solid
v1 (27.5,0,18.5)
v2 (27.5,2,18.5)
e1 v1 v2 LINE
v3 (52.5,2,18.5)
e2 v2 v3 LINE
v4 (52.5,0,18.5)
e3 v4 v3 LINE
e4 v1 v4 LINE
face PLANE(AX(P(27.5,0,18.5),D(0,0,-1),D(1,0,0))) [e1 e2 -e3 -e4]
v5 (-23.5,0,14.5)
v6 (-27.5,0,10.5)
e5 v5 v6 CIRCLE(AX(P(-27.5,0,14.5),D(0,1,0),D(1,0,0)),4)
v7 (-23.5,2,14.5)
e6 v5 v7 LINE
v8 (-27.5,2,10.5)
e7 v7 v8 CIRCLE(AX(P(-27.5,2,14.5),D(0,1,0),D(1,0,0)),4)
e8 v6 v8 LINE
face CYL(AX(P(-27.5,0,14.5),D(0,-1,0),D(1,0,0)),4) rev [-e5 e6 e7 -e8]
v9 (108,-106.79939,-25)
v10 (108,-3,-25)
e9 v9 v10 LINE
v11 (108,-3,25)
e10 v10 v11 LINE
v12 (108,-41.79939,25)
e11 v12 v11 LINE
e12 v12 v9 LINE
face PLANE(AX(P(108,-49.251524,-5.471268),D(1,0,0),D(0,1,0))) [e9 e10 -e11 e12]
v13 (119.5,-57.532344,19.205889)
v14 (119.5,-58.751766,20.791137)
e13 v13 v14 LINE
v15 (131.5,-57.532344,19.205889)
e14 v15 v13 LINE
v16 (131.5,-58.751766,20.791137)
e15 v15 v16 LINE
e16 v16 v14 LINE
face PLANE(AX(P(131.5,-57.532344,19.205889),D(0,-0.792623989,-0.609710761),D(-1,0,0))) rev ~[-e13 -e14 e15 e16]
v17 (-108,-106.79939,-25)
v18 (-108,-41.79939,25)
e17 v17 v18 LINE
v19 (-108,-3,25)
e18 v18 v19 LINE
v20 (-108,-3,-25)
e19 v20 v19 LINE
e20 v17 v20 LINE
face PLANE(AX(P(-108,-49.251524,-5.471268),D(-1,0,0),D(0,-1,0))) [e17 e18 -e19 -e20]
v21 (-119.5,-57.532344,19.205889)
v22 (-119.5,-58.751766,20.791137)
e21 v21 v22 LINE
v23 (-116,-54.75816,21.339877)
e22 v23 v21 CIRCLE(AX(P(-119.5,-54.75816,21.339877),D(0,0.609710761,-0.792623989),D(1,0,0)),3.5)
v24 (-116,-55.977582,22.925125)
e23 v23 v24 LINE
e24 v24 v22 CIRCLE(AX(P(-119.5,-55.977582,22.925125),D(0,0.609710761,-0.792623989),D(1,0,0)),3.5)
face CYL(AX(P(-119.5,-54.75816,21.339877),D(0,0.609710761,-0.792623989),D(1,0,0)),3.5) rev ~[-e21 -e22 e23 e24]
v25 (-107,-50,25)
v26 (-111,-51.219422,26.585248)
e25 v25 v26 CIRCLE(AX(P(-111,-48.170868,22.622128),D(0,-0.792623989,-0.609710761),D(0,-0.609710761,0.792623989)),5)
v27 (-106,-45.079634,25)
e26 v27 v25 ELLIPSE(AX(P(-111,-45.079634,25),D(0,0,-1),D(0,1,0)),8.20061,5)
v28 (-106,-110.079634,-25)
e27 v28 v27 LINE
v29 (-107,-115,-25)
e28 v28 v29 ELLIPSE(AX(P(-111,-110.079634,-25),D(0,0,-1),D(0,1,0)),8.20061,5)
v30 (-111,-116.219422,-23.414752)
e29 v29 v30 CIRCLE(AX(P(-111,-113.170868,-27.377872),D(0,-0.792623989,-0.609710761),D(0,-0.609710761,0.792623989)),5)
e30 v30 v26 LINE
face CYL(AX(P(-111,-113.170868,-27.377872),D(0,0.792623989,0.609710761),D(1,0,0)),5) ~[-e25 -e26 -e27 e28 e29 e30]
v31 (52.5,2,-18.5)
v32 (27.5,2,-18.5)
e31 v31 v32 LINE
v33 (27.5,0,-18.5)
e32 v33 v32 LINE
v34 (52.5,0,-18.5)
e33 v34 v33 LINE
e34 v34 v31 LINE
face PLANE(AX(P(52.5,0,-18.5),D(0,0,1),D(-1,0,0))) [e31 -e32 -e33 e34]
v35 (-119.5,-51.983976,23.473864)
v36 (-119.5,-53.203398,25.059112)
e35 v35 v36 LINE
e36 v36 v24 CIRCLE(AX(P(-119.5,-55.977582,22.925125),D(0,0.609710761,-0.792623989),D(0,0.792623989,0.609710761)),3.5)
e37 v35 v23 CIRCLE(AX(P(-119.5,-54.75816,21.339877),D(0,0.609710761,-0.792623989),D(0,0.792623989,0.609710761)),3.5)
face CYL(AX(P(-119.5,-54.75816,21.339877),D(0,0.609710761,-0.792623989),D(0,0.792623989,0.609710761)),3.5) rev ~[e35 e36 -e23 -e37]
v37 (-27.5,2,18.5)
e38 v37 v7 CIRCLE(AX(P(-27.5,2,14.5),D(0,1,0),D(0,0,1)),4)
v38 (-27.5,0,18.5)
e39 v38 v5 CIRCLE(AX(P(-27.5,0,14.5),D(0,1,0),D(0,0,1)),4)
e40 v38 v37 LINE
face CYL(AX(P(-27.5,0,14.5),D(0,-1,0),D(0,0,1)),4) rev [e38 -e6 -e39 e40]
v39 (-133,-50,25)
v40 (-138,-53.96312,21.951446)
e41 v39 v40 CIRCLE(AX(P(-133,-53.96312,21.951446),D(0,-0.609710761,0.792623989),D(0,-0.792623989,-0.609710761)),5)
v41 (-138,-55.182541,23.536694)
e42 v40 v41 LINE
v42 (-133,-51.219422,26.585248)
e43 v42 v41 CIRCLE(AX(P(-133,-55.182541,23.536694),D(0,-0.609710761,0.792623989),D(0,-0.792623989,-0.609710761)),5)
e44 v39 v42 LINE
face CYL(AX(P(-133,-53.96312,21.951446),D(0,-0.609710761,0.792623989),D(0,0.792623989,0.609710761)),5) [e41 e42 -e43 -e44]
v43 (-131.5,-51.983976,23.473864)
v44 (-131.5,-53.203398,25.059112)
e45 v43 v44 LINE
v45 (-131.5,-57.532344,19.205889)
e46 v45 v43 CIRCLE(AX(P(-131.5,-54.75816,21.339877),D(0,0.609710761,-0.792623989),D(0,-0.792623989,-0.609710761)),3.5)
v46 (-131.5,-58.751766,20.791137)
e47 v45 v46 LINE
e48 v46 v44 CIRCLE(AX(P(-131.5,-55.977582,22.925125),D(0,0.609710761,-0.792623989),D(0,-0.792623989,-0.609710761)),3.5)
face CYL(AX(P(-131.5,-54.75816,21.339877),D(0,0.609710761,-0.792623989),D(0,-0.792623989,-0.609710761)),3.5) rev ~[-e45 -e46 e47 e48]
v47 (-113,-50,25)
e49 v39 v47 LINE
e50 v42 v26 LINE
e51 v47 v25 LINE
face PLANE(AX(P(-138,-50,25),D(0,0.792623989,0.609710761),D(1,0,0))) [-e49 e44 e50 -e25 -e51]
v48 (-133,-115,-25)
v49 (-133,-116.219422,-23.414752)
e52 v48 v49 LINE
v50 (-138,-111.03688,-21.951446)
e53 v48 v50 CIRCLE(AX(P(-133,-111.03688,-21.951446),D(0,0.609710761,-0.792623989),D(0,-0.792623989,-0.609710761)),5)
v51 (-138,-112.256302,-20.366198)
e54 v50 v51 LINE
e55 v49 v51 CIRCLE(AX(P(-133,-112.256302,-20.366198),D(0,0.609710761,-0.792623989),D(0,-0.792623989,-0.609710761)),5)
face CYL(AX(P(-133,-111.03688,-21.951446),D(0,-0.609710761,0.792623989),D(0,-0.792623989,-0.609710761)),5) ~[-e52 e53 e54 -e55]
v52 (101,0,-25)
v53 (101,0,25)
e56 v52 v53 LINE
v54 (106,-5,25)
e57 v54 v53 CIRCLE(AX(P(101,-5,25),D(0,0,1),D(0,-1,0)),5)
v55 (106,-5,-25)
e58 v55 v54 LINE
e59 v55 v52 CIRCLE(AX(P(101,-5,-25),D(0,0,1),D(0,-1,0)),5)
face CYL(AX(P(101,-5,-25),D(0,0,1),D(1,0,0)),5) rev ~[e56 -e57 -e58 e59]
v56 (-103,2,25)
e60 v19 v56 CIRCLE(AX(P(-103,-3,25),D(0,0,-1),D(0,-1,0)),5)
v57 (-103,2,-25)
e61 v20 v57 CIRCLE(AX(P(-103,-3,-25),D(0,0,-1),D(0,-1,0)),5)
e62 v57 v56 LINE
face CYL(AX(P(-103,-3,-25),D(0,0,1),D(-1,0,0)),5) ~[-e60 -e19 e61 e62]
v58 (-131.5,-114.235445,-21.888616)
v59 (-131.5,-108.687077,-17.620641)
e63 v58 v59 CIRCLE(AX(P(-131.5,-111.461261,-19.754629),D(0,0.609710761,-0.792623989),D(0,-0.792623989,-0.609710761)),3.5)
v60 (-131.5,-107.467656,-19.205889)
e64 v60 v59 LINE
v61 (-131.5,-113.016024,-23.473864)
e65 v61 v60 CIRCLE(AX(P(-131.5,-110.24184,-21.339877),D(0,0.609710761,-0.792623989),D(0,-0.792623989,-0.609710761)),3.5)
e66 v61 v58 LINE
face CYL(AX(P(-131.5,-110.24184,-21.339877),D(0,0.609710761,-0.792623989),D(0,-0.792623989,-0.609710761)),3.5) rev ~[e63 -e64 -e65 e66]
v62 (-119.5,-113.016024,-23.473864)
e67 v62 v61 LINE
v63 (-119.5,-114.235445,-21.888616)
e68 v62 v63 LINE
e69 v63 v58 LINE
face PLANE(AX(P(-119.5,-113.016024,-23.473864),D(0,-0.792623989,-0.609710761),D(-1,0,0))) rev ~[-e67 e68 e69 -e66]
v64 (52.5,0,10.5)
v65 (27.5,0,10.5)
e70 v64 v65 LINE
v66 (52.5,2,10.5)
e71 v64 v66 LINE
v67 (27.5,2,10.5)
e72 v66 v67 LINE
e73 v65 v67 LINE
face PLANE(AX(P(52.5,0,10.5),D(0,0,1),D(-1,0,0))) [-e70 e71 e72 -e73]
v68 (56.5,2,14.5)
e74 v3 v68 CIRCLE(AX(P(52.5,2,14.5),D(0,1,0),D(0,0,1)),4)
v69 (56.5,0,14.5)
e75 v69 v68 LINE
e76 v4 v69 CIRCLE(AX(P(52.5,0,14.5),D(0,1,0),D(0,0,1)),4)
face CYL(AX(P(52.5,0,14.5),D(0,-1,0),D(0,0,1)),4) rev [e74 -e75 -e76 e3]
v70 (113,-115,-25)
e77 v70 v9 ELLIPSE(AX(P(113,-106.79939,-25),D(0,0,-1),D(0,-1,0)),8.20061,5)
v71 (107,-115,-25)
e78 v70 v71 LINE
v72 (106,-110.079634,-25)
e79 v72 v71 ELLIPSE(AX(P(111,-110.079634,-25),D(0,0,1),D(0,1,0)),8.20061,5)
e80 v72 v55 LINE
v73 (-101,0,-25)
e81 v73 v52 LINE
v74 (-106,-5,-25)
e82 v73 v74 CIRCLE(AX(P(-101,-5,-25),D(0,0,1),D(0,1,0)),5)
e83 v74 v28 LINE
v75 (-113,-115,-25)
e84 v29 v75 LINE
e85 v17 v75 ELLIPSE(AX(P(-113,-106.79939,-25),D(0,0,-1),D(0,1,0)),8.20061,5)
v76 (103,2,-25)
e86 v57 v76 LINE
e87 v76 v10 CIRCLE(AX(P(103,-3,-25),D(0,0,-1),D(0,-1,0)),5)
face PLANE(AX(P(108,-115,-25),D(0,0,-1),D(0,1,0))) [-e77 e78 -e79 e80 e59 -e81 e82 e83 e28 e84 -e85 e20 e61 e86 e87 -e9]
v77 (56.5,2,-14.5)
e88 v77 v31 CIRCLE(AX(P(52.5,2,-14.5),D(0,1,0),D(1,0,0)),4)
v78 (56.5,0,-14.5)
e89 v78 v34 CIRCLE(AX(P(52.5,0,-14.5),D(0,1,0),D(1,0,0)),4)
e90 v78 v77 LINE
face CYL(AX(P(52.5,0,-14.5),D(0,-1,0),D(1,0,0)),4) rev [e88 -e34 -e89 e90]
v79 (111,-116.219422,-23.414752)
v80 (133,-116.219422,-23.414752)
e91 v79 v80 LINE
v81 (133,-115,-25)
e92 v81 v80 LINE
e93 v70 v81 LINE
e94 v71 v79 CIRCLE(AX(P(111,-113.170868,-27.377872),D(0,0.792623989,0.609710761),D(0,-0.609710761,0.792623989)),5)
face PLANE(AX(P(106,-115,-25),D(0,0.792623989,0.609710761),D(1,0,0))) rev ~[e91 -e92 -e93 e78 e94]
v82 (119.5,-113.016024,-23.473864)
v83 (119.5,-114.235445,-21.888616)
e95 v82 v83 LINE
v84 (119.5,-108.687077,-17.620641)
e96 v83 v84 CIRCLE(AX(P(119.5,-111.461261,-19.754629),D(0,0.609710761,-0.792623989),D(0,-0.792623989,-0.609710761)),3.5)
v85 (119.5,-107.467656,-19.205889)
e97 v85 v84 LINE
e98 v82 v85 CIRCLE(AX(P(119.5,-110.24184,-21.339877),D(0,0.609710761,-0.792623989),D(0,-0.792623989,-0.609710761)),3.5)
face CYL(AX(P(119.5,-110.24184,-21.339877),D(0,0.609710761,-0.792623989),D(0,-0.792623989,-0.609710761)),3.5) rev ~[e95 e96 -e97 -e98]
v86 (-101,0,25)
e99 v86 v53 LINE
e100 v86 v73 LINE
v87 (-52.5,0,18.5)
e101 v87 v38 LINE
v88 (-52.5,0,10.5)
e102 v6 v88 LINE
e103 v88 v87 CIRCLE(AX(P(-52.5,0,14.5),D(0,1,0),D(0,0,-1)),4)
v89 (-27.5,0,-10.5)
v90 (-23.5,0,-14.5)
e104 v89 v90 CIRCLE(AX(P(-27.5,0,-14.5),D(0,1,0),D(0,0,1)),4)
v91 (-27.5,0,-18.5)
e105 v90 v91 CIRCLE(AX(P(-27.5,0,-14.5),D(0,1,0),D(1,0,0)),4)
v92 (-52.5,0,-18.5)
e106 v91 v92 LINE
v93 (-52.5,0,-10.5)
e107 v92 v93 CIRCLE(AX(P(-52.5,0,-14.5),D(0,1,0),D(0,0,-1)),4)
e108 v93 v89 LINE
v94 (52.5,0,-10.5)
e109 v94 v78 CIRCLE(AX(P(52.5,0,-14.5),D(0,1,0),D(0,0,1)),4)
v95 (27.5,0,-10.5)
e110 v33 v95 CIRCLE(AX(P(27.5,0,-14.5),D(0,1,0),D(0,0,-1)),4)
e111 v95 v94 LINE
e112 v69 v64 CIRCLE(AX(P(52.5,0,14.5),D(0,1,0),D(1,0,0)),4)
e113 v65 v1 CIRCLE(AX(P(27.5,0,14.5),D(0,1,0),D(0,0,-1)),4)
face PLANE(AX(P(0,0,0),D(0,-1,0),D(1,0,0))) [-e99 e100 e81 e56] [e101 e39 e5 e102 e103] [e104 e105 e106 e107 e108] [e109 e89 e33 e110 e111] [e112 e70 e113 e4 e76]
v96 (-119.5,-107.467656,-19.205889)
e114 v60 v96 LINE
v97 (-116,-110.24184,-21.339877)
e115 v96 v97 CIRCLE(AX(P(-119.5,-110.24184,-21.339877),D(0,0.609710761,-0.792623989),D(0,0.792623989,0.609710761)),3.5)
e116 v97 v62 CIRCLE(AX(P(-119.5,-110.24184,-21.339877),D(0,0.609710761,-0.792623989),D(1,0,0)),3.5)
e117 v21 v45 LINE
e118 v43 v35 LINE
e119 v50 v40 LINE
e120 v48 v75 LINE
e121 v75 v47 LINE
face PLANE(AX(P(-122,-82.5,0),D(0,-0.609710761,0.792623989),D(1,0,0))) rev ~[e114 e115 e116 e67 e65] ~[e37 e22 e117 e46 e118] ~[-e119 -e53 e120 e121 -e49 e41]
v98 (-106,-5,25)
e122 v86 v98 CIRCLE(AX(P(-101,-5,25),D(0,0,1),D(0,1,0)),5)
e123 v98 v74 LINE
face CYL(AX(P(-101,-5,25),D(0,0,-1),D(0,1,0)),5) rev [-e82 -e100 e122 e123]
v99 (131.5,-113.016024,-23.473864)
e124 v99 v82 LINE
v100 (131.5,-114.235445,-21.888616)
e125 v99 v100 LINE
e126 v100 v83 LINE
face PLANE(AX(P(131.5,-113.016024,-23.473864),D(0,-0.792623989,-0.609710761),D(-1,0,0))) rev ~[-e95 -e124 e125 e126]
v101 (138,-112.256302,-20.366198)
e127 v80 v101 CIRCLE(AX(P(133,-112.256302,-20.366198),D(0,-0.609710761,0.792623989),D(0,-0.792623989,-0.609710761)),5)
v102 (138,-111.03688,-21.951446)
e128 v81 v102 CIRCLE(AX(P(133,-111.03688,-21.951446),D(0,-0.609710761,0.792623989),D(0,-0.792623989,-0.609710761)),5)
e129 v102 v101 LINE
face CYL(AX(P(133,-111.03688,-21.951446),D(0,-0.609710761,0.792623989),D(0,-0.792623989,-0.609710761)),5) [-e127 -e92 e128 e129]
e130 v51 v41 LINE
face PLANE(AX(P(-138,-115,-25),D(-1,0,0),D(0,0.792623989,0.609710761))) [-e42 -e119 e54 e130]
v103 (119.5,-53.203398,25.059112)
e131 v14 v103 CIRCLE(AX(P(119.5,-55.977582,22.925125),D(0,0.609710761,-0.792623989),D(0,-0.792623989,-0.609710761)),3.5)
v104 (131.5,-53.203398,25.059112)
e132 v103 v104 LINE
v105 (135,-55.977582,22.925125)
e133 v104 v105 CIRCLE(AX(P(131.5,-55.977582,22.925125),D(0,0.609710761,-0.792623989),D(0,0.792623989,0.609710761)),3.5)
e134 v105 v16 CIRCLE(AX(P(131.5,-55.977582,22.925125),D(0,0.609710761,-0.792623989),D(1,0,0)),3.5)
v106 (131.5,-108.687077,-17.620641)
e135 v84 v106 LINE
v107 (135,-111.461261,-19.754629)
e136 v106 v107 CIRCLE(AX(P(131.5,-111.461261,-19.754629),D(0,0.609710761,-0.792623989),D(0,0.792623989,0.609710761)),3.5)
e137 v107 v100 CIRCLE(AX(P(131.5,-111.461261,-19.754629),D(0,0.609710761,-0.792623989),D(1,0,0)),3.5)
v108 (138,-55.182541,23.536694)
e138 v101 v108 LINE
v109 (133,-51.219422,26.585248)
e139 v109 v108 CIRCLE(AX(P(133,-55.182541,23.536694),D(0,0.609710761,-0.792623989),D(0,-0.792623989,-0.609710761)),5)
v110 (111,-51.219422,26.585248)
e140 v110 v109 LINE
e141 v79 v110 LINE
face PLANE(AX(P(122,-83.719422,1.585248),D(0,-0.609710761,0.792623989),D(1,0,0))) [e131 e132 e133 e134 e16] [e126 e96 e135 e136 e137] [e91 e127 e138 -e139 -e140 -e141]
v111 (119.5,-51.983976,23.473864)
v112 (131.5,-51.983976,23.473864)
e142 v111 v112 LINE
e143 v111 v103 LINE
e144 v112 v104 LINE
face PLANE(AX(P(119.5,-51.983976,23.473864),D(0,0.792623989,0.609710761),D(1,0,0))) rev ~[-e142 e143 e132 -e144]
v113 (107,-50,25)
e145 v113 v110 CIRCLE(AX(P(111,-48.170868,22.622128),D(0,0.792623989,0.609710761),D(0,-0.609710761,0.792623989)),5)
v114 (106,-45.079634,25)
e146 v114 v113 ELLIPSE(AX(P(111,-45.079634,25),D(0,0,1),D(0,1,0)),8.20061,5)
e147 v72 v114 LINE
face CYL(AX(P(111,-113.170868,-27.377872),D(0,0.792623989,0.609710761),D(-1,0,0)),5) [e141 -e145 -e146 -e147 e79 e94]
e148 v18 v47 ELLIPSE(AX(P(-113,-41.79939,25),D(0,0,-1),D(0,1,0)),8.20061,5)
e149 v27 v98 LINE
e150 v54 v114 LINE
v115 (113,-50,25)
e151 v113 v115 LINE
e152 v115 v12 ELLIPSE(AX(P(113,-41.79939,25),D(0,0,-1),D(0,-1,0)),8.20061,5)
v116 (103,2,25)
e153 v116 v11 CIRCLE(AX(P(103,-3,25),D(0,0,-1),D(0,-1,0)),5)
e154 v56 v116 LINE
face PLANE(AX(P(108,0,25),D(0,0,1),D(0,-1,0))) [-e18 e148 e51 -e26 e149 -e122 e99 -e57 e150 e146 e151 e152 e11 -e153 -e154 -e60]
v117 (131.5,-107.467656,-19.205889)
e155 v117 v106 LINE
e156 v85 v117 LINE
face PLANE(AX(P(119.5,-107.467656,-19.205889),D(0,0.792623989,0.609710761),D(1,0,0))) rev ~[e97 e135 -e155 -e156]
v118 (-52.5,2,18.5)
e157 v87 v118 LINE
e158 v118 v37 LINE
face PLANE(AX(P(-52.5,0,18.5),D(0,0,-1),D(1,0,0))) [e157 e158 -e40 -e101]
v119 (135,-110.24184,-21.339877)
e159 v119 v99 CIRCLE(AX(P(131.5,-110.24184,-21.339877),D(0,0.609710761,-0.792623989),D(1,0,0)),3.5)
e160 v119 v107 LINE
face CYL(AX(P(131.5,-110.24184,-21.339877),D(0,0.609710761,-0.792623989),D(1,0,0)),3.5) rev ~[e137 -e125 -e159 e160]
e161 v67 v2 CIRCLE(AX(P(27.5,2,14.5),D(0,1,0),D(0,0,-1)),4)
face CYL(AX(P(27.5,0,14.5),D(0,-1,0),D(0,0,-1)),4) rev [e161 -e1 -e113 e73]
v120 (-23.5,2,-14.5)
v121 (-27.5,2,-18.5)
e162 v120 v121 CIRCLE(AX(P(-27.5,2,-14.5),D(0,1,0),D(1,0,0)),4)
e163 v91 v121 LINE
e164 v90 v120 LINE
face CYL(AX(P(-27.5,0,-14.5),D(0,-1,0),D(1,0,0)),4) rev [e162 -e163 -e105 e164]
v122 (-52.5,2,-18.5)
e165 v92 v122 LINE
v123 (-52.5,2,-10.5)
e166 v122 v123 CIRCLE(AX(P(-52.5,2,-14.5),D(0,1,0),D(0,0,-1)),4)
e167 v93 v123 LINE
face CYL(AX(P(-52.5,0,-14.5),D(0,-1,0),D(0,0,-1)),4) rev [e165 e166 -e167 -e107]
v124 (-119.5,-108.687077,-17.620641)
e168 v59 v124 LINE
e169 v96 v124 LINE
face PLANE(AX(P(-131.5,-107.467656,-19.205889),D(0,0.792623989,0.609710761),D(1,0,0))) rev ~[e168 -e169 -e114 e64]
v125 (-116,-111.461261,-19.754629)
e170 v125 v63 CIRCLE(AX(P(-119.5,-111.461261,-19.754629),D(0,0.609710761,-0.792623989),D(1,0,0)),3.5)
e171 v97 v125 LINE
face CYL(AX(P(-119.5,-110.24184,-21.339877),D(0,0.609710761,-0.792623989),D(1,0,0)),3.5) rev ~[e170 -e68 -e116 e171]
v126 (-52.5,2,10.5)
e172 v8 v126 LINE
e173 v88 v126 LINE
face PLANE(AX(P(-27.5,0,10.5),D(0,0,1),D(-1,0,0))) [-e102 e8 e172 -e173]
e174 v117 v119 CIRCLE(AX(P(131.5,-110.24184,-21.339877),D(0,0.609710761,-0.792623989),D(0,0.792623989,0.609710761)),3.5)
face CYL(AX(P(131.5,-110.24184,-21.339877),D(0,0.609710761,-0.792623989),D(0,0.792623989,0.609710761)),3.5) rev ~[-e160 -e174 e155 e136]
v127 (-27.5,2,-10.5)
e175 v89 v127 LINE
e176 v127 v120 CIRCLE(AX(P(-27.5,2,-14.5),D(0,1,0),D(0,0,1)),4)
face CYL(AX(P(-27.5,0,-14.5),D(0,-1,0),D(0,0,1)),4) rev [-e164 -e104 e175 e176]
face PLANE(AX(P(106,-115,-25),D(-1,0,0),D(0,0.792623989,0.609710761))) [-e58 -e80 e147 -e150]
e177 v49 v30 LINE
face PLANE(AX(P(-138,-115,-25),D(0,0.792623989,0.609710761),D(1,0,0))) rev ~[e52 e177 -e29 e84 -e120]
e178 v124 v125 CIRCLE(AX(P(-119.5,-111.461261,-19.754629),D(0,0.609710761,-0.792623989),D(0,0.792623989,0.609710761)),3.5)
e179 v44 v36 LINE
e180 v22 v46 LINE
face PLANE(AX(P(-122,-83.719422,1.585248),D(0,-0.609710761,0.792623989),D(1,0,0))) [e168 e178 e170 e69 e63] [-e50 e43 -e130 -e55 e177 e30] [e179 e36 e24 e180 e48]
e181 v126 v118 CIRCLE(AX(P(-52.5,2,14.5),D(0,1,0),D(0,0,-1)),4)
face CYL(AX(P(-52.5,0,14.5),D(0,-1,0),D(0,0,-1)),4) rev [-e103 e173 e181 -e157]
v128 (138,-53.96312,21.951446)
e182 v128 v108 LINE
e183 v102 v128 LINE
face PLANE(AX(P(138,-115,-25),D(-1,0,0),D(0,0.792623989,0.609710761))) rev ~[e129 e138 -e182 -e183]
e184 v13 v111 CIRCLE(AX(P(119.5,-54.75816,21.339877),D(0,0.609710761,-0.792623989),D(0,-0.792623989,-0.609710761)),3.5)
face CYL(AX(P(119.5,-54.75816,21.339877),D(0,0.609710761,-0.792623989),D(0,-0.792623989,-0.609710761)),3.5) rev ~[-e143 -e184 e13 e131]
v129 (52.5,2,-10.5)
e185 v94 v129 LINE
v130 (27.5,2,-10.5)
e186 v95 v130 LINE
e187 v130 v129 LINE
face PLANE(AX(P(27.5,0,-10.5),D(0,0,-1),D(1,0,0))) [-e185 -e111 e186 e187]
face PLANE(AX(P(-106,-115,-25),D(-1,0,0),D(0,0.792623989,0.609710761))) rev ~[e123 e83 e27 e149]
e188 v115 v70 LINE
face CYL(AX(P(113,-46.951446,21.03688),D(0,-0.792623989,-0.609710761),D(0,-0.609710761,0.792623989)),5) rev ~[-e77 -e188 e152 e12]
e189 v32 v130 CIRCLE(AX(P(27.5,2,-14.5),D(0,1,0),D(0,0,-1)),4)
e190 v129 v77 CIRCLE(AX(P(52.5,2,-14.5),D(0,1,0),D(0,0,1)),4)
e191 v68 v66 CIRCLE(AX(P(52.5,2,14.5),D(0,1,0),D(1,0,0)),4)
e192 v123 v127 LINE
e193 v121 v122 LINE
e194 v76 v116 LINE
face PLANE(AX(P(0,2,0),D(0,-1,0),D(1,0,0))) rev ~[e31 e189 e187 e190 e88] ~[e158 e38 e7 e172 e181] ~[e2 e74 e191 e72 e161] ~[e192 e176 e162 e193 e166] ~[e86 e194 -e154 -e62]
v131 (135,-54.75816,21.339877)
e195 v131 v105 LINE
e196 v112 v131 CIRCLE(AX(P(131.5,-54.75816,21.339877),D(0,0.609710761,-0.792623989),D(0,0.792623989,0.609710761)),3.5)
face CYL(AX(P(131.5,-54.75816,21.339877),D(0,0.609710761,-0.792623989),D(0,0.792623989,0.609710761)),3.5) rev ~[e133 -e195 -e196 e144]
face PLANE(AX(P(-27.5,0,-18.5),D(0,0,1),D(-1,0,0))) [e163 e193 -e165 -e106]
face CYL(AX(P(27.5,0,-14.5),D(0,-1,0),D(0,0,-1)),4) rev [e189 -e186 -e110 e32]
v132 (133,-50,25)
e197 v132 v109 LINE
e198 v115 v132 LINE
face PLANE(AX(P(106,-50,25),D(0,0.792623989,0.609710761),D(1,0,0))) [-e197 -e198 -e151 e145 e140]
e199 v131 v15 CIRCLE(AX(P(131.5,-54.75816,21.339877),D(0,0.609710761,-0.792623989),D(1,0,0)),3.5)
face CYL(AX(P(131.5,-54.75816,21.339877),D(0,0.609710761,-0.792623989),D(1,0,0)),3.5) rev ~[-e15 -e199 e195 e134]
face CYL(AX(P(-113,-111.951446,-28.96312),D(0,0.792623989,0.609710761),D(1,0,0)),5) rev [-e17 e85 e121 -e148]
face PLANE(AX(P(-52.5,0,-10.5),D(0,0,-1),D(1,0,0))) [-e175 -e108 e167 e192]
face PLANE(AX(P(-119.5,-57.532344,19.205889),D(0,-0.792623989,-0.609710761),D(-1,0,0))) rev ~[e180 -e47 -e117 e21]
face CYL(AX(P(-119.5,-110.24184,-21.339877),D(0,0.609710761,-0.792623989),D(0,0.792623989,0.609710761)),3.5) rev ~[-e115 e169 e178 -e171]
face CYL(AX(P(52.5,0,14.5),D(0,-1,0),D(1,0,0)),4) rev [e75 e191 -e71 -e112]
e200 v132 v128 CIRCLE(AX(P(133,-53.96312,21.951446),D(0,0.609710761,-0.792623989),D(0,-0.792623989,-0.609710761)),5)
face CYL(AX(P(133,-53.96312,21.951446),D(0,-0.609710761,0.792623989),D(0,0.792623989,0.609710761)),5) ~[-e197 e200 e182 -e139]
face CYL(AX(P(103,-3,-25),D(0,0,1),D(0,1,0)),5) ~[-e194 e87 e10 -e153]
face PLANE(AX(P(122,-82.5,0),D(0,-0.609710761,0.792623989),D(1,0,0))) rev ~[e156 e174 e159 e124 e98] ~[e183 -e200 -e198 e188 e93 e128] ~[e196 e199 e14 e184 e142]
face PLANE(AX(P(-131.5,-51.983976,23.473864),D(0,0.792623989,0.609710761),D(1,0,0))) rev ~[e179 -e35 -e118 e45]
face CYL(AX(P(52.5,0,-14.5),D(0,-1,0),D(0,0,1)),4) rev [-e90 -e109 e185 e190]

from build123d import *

# Parameters (mm, degrees)
F0_W     = 216
F0_H     = 50
F1_DEPTH = 2
F3_DEPTH = 2
F4_W     = 32
F4_H     = 82.0060973343
F5_DEPTH = 2
F7_DEPTH = 2
F8_W     = 32
F8_H     = 82.0060973343
F9_DEPTH = 2
F10_R    = 5


# Not quite as in the source:
# - a feature names something its author has since deleted; it is built from what else it names


with BuildPart() as f1:
    # F0 (on Front) → F1 (new body)
    with BuildSketch(Plane.XZ):
        Rectangle(F0_W, F0_H)
        with BuildLine():
            ThreePointArc((-27.5, -10.5), (-24.6715728753, -11.6715728753), (-23.5, -14.5))
            ThreePointArc((-23.5, -14.5), (-24.6715728753, -17.3284271247), (-27.5, -18.5))
            Line((-27.5, -18.5), (-52.5, -18.5))
            ThreePointArc((-52.5, -18.5), (-56.5, -14.5), (-52.5, -10.5))
            Line((-52.5, -10.5), (-27.5, -10.5))
        make_face(mode=Mode.SUBTRACT)
        with BuildLine():
            ThreePointArc((27.5, -18.5), (23.5, -14.5), (27.5, -10.5))
            Line((27.5, -10.5), (52.5, -10.5))
            ThreePointArc((52.5, -10.5), (55.3284271247, -11.6715728753), (56.5, -14.5))
            ThreePointArc((56.5, -14.5), (55.3284271247, -17.3284271247), (52.5, -18.5))
            Line((52.5, -18.5), (27.5, -18.5))
        make_face(mode=Mode.SUBTRACT)
        with BuildLine():
            ThreePointArc((-52.5, 10.5), (-56.5, 14.5), (-52.5, 18.5))
            Line((-52.5, 18.5), (-27.5, 18.5))
            ThreePointArc((-27.5, 18.5), (-24.6715728753, 17.3284271247), (-23.5, 14.5))
            ThreePointArc((-23.5, 14.5), (-24.6715728753, 11.6715728753), (-27.5, 10.5))
            Line((-27.5, 10.5), (-52.5, 10.5))
        make_face(mode=Mode.SUBTRACT)
        with BuildLine():
            ThreePointArc((27.5, 10.5), (23.5, 14.5), (27.5, 18.5))
            Line((27.5, 18.5), (52.5, 18.5))
            ThreePointArc((52.5, 18.5), (55.3284271247, 17.3284271247), (56.5, 14.5))
            ThreePointArc((56.5, 14.5), (55.3284271247, 11.6715728753), (52.5, 10.5))
            Line((52.5, 10.5), (27.5, 10.5))
        make_face(mode=Mode.SUBTRACT)
    extrude(amount=-F1_DEPTH)

    # F2 (on face) → F3 (join)
    with BuildSketch(Plane(origin=(-108, 0, 0), x_dir=(0, -1, 0), z_dir=(-1, 0, 0))):
        Polygon((0, 25), (0, -25), (115, -25), (50, 25), align=None)
    extrude(amount=-F3_DEPTH)

    # F4 (on face) → F5 (join)
    with BuildSketch(Plane(origin=(0, -30.6691449814, 39.8698884758), x_dir=(1, 0, 0), z_dir=(0, -0.6097107608, 0.7926239891))):
        with Locations((-122, -65.3914791011)):
            Rectangle(F4_W, F4_H)
        with BuildLine():
            ThreePointArc((-119.5, -96.8914791011), (-117.0251262658, -97.916605367), (-116, -100.3914791011))
            ThreePointArc((-116, -100.3914791011), (-117.0251262658, -102.8663528353), (-119.5, -103.8914791011))
            Line((-119.5, -103.8914791011), (-131.5, -103.8914791011))
            ThreePointArc((-131.5, -103.8914791011), (-135, -100.3914791011), (-131.5, -96.8914791011))
            Line((-131.5, -96.8914791011), (-119.5, -96.8914791011))
        make_face(mode=Mode.SUBTRACT)
        with BuildLine():
            ThreePointArc((-131.5, -33.8914791011), (-135, -30.3914791011), (-131.5, -26.8914791011))
            Line((-131.5, -26.8914791011), (-119.5, -26.8914791011))
            ThreePointArc((-119.5, -26.8914791011), (-117.0251262658, -27.916605367), (-116, -30.3914791011))
            ThreePointArc((-116, -30.3914791011), (-117.0251262658, -32.8663528353), (-119.5, -33.8914791011))
            Line((-119.5, -33.8914791011), (-131.5, -33.8914791011))
        make_face(mode=Mode.SUBTRACT)
    extrude(amount=F5_DEPTH)

    # F6 (on face) → F7 (join)
    with BuildSketch(Plane.YZ.offset(108)):
        Polygon((0, -25), (0, 25), (-50, 25), (-115, -25), align=None)
    extrude(amount=-F7_DEPTH)

    # F8 (on face) → F9 (join)
    with BuildSketch(Plane(origin=(0, -30.6691449814, 39.8698884758), x_dir=(1, 0, 0), z_dir=(0, -0.6097107608, 0.7926239891))):
        with Locations((122, -65.3914791011)):
            Rectangle(F8_W, F8_H)
        with BuildLine():
            ThreePointArc((131.5, -96.8914791011), (133.9748737342, -97.916605367), (135, -100.3914791011))
            ThreePointArc((135, -100.3914791011), (133.9748737342, -102.8663528353), (131.5, -103.8914791011))
            Line((131.5, -103.8914791011), (119.5, -103.8914791011))
            ThreePointArc((119.5, -103.8914791011), (116, -100.3914791011), (119.5, -96.8914791011))
            Line((119.5, -96.8914791011), (131.5, -96.8914791011))
        make_face(mode=Mode.SUBTRACT)
        with BuildLine():
            ThreePointArc((119.5, -33.8914791011), (116, -30.3914791011), (119.5, -26.8914791011))
            Line((119.5, -26.8914791011), (131.5, -26.8914791011))
            ThreePointArc((131.5, -26.8914791011), (133.9748737342, -27.916605367), (135, -30.3914791011))
            ThreePointArc((135, -30.3914791011), (133.9748737342, -32.8663528353), (131.5, -33.8914791011))
            Line((131.5, -33.8914791011), (119.5, -33.8914791011))
        make_face(mode=Mode.SUBTRACT)
    extrude(amount=F9_DEPTH)

    # F10
    f10_edges = [f1.edges().sort_by_distance(p)[0] for p in [
        (-106, -83.719422, 1.585248),
        (-108, -82.5, 0),
        (-108, 2, 0),
        (-106, 0, 0),
        (106, 0, 0),
        (108, 2, 0),
        (108, -82.5, 0),
        (-138, -115.609711, -24.207376),
        (-138, -50.609711, 25.792624),
        (106, -83.719422, 1.585248),
        (138, -50.609711, 25.792624),
        (138, -115.609711, -24.207376),
    ]]
    fillet(f10_edges, radius=F10_R)


solid = f1.part
